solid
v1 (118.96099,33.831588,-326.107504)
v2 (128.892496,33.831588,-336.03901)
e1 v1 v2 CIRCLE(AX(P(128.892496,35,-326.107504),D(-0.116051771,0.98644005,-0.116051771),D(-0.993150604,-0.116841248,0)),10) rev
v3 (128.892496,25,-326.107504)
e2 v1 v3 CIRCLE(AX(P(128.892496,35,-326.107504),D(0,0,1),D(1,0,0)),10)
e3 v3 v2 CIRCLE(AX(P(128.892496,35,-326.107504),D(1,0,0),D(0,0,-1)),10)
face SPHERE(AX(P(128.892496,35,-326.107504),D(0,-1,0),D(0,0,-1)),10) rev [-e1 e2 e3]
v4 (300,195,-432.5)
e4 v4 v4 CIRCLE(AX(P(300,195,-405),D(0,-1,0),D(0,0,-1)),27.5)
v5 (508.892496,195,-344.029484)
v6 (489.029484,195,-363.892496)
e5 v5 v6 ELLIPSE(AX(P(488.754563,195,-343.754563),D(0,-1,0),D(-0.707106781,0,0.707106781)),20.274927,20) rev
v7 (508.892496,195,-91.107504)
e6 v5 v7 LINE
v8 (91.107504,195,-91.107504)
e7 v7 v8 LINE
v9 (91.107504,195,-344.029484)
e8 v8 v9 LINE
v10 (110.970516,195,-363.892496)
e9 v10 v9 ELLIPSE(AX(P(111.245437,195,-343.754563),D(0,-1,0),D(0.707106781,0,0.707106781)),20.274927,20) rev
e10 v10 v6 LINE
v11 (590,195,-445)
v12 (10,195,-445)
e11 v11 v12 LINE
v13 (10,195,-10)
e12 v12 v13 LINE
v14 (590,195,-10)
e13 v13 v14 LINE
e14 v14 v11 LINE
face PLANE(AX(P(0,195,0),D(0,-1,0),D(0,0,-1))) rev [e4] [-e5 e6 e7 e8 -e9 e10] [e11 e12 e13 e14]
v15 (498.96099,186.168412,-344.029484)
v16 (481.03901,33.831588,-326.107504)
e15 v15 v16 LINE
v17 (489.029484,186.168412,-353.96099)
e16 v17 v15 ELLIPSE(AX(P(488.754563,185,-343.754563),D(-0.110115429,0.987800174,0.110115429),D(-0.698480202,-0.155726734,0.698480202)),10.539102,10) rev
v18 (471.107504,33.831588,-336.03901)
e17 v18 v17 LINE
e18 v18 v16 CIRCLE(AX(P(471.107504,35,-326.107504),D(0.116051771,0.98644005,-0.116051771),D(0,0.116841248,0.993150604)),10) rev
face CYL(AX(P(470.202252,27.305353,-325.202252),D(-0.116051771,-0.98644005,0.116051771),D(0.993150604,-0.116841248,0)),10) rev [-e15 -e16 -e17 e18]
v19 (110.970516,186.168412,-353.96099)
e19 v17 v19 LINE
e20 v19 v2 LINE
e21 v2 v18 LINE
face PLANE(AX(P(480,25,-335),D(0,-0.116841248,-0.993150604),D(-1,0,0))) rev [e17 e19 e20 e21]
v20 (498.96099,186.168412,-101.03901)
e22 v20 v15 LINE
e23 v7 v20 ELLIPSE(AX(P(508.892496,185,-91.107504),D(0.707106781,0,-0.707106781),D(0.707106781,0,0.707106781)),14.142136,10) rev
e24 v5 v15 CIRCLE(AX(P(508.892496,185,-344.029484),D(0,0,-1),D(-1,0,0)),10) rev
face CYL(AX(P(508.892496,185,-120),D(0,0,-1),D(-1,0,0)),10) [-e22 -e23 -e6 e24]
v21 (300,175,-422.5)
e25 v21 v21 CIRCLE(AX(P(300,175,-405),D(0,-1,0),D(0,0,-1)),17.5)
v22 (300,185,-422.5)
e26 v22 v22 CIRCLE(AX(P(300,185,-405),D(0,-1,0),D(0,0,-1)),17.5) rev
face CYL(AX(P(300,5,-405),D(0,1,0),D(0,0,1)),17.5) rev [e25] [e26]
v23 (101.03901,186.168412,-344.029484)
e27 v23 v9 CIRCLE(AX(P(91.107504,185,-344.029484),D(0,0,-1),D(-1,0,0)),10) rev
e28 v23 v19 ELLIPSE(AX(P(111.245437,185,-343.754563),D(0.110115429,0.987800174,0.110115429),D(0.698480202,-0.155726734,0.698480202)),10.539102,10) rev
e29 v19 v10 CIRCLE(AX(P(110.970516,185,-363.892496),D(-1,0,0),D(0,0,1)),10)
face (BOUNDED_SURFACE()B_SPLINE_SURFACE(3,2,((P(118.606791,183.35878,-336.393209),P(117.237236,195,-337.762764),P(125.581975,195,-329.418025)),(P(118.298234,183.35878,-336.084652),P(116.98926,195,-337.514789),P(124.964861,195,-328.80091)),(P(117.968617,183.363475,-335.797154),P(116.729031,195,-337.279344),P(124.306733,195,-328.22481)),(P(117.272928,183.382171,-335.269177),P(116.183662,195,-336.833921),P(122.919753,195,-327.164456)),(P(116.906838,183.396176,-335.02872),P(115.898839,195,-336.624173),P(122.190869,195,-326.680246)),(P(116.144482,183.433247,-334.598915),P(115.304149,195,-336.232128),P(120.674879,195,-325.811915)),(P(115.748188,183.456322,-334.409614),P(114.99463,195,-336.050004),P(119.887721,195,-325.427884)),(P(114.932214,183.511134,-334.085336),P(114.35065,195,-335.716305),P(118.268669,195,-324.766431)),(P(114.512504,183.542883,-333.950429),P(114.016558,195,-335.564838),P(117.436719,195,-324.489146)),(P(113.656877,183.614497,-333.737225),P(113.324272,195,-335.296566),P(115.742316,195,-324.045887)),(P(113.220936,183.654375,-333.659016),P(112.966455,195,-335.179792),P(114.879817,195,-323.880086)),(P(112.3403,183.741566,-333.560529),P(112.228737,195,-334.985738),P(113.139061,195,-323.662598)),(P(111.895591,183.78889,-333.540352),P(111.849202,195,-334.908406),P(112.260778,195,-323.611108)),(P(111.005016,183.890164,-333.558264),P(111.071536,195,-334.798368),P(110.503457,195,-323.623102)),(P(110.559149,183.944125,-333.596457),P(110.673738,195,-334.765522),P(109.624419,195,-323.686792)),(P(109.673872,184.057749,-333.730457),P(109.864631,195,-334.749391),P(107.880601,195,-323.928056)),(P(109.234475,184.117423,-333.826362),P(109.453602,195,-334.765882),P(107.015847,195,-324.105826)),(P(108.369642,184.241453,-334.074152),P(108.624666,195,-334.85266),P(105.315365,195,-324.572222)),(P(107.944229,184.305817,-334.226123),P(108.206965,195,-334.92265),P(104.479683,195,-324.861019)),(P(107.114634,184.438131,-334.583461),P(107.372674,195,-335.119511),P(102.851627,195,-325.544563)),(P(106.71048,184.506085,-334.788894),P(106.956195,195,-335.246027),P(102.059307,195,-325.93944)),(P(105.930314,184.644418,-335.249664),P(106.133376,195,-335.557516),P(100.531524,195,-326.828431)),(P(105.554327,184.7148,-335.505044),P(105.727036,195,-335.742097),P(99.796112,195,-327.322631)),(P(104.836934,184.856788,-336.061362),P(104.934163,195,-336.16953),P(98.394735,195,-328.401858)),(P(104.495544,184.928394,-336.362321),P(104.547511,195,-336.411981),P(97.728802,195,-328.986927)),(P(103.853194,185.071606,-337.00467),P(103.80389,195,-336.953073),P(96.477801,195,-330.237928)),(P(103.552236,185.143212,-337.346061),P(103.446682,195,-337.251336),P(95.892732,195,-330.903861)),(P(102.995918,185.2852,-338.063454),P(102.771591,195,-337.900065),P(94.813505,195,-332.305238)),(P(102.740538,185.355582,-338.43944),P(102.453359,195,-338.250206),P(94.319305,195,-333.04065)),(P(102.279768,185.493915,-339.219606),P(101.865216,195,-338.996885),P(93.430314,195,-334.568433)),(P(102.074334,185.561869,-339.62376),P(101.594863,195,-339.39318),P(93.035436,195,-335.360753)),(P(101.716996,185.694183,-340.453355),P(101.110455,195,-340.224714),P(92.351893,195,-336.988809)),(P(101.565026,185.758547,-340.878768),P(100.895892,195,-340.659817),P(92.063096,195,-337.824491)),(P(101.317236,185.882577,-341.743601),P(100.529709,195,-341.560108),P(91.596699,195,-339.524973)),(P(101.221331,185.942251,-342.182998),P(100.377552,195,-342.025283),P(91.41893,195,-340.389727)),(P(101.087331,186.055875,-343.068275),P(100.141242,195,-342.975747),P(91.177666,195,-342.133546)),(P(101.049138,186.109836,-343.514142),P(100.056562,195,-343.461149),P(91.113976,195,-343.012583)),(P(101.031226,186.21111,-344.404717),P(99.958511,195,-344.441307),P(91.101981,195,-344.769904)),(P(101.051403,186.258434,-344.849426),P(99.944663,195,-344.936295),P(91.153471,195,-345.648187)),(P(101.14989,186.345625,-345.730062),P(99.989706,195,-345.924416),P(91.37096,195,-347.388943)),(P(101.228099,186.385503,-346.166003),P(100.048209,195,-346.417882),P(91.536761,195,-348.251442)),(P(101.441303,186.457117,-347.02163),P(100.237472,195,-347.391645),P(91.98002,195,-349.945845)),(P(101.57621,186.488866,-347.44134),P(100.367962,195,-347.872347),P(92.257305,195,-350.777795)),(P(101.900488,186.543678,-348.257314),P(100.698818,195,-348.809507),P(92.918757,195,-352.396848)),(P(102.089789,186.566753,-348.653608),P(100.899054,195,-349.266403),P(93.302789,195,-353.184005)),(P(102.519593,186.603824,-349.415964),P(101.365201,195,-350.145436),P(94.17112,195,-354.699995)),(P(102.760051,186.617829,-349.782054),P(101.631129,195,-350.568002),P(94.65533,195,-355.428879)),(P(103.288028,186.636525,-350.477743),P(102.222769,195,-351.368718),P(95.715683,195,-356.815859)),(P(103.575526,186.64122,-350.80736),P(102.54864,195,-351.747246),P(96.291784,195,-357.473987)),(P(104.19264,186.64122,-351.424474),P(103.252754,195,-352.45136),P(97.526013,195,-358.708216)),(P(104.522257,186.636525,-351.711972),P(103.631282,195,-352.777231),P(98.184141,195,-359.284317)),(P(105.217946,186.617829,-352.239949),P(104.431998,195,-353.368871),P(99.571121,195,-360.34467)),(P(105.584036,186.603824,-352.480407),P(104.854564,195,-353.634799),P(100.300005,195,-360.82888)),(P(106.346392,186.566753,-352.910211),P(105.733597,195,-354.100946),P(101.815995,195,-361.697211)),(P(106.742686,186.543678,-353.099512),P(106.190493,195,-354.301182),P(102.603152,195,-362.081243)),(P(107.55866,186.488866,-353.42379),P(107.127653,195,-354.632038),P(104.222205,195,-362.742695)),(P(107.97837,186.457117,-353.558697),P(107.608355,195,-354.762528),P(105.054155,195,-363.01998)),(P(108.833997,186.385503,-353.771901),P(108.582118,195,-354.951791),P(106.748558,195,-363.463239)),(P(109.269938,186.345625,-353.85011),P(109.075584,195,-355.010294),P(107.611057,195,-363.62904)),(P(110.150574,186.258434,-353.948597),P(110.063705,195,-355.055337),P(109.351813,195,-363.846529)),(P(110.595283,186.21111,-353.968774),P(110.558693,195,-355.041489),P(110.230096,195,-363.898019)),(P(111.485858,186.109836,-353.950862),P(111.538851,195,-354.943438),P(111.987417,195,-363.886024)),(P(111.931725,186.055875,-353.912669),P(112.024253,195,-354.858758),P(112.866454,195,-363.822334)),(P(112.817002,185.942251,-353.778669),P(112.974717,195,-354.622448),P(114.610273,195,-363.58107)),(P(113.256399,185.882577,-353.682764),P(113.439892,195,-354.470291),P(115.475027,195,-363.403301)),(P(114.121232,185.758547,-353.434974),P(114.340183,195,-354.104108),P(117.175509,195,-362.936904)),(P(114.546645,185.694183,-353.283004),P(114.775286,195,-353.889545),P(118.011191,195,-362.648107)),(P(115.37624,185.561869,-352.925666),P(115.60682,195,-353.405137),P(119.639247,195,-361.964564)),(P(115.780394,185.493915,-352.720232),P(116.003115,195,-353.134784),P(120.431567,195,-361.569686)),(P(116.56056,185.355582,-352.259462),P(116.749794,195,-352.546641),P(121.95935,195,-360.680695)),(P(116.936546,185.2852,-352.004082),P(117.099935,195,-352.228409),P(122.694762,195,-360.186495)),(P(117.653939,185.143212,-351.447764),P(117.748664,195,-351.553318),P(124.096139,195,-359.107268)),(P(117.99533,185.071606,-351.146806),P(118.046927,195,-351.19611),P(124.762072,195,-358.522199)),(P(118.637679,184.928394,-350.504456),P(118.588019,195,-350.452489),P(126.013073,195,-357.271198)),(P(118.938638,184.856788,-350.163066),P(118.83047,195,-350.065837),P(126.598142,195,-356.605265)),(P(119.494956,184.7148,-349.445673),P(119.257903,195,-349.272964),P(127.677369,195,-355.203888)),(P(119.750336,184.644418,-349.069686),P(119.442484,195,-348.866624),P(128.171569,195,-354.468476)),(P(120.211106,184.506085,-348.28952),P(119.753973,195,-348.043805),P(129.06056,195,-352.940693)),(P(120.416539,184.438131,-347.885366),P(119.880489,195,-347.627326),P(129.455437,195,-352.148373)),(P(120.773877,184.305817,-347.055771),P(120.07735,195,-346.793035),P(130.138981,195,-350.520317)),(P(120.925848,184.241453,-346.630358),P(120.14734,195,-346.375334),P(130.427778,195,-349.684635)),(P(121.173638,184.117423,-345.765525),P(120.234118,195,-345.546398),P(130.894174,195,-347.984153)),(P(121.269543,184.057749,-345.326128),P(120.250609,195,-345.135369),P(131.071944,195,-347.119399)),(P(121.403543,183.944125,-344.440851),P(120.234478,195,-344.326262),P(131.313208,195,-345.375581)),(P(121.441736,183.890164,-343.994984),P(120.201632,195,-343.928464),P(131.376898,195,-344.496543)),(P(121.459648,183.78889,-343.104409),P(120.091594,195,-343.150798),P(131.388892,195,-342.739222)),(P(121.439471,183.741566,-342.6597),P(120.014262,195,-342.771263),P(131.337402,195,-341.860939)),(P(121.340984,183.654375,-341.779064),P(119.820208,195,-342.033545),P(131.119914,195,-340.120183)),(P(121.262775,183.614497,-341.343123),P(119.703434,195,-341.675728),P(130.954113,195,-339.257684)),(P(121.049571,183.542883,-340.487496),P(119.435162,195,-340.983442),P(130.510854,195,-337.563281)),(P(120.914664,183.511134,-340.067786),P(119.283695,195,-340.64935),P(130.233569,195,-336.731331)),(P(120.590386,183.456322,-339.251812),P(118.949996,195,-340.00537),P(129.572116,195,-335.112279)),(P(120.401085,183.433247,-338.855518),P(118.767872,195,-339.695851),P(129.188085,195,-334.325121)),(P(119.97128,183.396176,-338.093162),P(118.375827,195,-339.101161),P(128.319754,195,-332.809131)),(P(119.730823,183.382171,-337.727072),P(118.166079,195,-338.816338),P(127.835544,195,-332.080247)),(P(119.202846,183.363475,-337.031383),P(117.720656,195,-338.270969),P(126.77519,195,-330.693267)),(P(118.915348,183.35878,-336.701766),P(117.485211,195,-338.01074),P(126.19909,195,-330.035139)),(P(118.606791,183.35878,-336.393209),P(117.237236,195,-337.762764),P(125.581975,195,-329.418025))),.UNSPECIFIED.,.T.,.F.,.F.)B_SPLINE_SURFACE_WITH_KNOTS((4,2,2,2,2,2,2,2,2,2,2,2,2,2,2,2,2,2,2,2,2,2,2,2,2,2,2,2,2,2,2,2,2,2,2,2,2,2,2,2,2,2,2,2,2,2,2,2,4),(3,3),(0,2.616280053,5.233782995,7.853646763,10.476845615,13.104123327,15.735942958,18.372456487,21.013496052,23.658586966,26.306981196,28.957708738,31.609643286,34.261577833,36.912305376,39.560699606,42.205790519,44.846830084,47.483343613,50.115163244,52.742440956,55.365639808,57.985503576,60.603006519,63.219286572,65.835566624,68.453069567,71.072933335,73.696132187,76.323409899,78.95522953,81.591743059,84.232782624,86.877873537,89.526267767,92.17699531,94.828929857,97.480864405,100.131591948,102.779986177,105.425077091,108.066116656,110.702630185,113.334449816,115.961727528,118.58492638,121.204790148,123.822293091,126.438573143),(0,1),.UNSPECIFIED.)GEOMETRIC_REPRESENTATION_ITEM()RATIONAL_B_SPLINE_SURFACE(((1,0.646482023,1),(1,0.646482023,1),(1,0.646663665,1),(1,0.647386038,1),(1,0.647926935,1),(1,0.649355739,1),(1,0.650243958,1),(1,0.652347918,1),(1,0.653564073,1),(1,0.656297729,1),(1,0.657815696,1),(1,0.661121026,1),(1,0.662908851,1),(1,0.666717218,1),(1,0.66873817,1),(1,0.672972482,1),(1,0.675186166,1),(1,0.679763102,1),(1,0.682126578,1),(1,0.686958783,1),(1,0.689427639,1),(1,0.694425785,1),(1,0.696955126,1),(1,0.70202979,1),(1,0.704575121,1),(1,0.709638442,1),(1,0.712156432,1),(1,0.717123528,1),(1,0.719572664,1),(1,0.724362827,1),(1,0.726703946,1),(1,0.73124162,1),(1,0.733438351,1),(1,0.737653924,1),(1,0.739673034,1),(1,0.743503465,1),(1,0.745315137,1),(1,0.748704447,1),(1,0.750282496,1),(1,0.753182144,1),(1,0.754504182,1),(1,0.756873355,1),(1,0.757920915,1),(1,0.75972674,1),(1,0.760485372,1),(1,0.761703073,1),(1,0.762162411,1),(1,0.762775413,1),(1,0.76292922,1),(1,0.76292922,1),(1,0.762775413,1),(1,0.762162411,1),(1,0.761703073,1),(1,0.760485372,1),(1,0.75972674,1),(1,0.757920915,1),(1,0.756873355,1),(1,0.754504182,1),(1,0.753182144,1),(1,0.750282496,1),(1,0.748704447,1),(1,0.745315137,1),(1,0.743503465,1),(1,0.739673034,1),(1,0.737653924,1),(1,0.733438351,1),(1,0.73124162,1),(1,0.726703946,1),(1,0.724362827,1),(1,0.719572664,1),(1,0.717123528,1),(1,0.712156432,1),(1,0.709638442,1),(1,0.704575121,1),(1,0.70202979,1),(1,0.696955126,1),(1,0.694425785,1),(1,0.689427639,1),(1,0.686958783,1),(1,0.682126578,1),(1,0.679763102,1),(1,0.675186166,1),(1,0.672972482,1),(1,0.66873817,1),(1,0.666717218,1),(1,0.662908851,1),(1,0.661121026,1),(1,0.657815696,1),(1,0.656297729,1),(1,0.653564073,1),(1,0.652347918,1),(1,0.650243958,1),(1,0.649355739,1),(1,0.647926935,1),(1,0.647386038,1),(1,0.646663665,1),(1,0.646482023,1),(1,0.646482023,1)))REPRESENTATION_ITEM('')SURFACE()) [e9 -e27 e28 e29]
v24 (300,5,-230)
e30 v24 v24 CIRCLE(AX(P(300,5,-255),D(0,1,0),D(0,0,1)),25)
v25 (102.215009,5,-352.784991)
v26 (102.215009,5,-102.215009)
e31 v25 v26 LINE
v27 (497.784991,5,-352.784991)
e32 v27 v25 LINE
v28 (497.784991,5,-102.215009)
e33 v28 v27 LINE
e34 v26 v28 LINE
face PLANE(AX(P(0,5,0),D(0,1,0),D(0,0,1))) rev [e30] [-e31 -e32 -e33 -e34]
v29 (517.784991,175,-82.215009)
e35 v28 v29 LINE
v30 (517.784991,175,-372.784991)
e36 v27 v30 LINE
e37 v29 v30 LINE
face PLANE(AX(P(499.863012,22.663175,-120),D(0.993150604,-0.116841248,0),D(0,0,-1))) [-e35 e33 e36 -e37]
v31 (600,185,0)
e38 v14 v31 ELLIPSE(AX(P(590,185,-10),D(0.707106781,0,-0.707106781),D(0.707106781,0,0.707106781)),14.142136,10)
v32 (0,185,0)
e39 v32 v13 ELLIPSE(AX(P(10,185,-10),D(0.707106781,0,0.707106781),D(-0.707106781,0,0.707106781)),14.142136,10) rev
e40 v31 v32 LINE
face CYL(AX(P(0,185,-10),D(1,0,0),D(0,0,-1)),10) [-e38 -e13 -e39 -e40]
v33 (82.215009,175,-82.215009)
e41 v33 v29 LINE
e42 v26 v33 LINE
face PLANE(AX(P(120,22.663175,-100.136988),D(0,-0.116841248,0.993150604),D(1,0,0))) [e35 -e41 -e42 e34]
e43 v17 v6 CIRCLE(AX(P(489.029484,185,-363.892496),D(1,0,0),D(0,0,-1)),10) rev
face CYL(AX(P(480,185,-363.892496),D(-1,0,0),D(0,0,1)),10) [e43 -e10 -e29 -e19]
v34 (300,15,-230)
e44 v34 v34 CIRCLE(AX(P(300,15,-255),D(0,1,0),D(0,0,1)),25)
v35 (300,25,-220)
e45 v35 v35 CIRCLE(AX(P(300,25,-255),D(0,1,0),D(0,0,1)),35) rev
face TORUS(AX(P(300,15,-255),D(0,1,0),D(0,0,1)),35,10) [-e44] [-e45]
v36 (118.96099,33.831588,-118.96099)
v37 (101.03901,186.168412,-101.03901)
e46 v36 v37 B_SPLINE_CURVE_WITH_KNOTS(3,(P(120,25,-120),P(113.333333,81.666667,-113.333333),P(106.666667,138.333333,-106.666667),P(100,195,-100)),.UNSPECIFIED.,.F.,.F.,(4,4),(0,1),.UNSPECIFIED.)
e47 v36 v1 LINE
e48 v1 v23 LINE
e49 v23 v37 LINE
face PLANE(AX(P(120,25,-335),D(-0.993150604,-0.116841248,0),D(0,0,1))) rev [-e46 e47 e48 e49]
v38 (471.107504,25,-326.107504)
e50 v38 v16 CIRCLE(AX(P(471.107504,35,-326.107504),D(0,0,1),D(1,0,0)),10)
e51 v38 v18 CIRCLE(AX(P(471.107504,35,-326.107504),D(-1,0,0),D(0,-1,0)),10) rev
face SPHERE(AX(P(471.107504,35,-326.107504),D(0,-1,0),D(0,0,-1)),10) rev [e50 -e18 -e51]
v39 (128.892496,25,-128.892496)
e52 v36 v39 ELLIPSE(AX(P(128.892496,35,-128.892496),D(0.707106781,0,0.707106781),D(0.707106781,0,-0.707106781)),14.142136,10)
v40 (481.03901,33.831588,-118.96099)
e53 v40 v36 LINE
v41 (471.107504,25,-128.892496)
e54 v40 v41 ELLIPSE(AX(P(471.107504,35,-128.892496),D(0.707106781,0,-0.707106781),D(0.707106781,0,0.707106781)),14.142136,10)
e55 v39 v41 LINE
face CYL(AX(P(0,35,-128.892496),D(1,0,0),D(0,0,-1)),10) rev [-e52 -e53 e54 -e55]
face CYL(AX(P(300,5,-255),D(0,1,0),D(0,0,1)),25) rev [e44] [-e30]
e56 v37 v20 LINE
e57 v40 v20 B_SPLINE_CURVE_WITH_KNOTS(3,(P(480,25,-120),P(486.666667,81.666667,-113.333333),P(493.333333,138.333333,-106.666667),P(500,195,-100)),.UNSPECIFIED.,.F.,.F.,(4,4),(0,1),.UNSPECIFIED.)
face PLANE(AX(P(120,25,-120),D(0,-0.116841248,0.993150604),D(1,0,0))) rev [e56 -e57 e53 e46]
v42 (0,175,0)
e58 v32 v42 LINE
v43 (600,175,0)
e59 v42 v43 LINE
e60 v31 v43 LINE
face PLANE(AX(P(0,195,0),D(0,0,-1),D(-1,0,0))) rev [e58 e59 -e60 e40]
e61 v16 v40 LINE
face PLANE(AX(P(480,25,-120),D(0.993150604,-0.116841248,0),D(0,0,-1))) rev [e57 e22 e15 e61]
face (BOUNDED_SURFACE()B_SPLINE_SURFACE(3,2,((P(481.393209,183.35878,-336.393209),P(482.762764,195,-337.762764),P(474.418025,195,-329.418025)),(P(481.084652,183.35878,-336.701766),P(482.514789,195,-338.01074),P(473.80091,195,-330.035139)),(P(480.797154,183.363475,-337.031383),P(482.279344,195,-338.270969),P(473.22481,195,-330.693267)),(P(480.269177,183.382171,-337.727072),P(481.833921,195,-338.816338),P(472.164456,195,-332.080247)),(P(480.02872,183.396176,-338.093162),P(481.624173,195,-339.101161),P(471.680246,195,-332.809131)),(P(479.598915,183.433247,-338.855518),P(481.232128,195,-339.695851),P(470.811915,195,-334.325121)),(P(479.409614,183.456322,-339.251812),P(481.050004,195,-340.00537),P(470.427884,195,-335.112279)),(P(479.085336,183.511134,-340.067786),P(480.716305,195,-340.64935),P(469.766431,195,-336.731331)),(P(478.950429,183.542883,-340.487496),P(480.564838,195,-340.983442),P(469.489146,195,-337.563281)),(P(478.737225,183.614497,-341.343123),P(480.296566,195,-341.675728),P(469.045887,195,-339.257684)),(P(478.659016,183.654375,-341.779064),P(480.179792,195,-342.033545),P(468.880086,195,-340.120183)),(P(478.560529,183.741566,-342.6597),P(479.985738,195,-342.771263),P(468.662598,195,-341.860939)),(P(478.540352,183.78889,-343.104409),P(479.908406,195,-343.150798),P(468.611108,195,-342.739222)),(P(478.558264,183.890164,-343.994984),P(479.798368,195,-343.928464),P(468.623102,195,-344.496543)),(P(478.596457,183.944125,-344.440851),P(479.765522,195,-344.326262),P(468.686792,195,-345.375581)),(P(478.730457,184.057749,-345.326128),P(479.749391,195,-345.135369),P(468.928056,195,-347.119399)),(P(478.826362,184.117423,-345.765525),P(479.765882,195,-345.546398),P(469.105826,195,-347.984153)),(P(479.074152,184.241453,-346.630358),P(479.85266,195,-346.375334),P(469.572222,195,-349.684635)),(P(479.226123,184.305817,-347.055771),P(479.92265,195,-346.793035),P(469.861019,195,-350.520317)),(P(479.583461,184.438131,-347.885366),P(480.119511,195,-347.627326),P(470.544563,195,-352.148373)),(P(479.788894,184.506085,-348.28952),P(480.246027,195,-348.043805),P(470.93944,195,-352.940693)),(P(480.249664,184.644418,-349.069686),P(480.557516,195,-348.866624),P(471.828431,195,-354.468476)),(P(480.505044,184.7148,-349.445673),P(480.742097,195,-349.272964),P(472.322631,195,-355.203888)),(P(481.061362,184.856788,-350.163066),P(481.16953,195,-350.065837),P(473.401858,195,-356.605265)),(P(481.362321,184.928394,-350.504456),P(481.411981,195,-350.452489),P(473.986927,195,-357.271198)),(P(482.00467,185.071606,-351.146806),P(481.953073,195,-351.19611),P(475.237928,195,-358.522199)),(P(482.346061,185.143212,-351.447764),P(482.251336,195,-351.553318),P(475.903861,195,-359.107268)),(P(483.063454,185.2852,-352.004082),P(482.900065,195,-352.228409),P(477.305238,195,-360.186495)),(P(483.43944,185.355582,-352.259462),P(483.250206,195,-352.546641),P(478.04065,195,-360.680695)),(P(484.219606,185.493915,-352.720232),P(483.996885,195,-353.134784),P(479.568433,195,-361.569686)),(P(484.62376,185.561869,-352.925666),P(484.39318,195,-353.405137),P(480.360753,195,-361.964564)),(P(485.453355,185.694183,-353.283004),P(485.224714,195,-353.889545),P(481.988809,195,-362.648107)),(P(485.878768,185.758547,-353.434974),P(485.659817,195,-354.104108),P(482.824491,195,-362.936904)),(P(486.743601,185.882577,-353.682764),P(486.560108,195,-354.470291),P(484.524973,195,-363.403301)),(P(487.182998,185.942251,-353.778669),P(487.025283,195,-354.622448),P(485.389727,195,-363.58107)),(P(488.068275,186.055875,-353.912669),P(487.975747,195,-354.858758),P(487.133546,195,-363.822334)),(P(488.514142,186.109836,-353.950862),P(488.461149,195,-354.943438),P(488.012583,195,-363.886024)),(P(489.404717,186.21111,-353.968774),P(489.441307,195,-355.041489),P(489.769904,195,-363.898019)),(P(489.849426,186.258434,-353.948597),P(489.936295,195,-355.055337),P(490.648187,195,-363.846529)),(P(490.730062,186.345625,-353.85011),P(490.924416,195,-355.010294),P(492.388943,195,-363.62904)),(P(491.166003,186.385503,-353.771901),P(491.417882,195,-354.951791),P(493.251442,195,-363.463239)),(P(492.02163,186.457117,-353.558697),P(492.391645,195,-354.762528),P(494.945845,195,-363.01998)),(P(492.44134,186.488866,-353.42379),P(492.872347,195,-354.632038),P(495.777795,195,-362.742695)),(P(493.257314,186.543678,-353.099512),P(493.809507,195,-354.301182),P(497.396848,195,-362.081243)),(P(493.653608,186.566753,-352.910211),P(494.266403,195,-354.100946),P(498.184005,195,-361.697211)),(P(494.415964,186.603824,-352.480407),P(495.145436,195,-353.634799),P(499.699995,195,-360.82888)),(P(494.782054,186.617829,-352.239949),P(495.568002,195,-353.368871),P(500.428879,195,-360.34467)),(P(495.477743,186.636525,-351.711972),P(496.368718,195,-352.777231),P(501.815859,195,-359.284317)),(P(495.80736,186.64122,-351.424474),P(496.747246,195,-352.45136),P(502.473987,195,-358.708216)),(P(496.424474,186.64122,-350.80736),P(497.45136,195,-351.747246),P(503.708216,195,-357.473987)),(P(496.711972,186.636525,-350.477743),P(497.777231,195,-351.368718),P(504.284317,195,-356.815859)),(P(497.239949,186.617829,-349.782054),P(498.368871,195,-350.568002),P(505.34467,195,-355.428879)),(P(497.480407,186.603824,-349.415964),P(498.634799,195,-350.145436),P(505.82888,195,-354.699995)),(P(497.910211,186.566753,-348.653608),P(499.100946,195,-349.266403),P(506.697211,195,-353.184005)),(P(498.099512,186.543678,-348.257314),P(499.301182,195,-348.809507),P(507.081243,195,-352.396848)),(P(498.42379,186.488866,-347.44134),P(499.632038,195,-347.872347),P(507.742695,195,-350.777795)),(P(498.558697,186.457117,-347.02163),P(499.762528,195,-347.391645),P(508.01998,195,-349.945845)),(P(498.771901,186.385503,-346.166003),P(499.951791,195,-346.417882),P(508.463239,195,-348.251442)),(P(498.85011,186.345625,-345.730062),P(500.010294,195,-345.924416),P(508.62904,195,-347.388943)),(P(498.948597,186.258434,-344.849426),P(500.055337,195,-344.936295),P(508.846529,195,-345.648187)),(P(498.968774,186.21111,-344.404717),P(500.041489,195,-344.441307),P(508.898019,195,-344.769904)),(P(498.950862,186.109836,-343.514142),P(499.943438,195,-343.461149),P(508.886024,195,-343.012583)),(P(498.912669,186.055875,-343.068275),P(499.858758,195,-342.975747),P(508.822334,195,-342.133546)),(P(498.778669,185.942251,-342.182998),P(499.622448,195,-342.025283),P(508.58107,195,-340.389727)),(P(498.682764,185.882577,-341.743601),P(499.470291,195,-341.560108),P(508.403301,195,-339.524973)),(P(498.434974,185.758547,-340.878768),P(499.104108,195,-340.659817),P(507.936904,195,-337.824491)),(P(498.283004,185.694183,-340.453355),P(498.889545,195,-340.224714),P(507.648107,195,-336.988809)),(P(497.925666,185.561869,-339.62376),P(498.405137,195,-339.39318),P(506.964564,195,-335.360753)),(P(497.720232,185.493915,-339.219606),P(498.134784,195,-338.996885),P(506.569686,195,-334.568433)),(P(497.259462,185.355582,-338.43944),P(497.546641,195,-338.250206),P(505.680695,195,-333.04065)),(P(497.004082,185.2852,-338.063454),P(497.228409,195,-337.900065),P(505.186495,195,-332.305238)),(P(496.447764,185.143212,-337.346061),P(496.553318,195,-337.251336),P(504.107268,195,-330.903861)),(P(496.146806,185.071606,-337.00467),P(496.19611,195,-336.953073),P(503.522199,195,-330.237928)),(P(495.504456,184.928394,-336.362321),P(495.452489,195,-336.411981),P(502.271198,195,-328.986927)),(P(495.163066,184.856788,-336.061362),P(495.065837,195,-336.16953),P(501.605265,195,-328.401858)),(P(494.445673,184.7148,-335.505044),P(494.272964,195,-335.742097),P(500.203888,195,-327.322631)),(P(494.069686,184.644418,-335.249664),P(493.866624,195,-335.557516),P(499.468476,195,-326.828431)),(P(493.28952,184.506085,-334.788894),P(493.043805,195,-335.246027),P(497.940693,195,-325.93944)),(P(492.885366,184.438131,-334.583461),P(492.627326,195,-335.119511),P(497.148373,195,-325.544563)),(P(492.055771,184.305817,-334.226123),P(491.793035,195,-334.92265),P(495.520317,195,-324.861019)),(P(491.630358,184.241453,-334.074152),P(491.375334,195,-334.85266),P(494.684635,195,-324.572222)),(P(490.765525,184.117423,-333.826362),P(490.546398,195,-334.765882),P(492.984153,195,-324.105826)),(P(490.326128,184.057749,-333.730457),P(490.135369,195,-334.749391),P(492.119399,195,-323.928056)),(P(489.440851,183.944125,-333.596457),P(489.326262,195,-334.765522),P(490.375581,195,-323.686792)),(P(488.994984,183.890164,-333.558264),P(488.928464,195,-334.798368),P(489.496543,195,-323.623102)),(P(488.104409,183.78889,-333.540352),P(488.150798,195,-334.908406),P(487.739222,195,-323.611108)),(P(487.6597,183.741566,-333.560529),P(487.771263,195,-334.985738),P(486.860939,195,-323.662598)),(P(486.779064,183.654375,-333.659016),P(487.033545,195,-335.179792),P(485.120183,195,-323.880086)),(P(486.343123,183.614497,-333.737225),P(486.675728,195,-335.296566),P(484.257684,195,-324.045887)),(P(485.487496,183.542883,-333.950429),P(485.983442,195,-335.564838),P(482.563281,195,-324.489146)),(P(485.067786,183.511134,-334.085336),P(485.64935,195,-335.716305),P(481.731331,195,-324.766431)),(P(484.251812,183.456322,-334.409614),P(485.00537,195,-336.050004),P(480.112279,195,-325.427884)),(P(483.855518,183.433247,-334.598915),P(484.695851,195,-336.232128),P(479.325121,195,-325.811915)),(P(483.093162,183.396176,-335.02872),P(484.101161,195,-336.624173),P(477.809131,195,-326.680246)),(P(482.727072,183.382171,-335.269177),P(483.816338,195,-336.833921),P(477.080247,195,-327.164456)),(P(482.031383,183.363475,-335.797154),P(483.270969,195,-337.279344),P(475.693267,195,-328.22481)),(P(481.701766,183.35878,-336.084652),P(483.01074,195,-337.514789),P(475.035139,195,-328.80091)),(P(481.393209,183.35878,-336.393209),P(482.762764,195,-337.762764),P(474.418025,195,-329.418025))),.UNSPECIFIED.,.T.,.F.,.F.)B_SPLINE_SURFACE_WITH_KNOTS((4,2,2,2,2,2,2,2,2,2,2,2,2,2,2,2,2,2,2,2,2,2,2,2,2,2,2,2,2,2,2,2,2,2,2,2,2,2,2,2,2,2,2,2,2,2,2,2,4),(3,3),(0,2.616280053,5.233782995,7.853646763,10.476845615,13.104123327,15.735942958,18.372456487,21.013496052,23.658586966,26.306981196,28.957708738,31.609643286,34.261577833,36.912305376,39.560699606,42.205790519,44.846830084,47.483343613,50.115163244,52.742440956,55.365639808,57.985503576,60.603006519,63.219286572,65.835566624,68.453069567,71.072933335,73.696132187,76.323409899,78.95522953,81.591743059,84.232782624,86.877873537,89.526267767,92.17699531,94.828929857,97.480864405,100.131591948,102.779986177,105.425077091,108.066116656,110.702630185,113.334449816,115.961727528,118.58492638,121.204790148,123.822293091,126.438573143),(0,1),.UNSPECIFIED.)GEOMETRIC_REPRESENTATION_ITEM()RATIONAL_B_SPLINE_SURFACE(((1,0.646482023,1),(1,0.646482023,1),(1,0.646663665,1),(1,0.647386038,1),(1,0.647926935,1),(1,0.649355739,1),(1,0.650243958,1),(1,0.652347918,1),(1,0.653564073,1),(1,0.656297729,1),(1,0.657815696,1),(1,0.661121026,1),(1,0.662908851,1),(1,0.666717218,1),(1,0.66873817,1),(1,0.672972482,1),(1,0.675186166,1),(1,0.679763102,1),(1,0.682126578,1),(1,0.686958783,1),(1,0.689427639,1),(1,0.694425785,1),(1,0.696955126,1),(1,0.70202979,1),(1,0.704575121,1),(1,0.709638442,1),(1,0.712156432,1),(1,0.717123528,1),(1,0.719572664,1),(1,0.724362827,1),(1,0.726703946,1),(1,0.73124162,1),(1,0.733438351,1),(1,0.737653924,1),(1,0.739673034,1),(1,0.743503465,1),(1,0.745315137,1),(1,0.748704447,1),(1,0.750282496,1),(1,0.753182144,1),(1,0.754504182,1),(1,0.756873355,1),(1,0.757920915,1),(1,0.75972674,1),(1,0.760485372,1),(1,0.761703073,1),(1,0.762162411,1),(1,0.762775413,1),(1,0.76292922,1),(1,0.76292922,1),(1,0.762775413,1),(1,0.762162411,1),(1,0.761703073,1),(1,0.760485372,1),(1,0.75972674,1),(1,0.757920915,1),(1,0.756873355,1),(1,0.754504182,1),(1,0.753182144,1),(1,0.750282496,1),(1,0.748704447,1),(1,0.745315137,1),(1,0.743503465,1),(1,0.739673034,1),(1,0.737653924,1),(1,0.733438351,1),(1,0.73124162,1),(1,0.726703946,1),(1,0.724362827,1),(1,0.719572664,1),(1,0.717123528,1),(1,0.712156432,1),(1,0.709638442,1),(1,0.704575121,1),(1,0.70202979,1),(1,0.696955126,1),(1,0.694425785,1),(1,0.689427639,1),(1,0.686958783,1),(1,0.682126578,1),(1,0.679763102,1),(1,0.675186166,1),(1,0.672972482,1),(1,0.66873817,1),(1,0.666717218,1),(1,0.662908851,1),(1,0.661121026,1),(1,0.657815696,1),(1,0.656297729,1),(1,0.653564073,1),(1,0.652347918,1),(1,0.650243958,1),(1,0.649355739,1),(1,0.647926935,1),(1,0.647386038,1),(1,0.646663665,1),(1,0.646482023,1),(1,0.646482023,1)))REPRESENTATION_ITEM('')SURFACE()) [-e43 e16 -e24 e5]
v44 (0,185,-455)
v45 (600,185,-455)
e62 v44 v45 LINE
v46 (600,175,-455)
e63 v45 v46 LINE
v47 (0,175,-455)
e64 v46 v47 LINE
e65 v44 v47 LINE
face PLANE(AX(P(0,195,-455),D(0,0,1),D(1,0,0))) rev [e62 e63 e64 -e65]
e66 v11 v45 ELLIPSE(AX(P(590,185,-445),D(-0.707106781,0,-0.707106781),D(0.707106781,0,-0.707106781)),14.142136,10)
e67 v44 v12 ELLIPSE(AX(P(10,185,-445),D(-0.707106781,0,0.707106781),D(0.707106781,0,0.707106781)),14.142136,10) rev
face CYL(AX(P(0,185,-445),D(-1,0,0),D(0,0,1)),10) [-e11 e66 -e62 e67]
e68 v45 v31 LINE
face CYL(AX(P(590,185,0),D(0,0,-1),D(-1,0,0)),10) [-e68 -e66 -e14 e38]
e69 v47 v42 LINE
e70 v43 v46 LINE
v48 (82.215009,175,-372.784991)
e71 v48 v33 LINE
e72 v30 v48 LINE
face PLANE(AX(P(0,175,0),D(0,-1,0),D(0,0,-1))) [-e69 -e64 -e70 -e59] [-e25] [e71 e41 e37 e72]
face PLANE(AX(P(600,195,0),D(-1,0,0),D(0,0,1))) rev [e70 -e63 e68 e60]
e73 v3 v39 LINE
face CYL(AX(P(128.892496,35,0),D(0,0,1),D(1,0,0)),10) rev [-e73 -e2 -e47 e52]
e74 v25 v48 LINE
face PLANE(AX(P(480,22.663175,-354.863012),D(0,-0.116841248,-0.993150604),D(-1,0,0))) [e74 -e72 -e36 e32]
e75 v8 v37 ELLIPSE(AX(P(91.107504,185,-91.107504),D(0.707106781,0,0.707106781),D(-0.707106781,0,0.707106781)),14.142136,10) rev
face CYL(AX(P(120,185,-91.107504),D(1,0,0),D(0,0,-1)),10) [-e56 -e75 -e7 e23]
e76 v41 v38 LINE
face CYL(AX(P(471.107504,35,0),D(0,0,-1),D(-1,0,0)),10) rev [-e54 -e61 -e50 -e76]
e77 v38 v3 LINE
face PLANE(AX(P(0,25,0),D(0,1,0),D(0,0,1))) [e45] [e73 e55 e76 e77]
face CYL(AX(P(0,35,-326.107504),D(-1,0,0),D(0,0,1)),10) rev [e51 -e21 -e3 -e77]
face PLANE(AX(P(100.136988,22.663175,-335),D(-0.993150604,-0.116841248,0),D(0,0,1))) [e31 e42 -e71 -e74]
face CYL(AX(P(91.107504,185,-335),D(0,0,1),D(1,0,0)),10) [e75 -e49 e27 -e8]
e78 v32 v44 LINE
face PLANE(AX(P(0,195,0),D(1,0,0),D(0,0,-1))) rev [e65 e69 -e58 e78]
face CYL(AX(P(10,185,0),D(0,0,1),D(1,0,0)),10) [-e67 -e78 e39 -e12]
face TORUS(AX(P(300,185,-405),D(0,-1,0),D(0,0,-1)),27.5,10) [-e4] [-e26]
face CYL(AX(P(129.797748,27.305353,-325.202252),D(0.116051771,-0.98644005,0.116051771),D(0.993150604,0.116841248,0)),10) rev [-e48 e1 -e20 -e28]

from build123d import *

# Parameters (mm, degrees)
SKETCH_1_W          = 600
SKETCH_1_H          = 455
EXTRUDE_1_DEPTH     = 195
LOFT_1_OUTLINE_W    = 360
LOFT_1_OUTLINE_H    = 215
LOFT_1_DEPTH        = 170
LOFT_1_DRAFT        = -6.7098368
SHELL_1_T           = -20
SKETCH_3_R          = 25
SKETCH_3_R_2        = 17.5
CUT_EXTRUDE_2_DEPTH = 777.61122835
FILLET_1_R          = 10


# Read off the part's stored shape, not the designer's step: Вырез-По сечениям1
with BuildPart() as part:
    # Эскиз1 → Бобышка-Вытянуть1 (new body)
    with BuildSketch(Plane(origin=(0, 0, 0), x_dir=(1, 0, 0), z_dir=(0, 1, 0))):
        with Locations((300, 227.5)):
            Rectangle(SKETCH_1_W, SKETCH_1_H)
    extrude(amount=EXTRUDE_1_DEPTH)


with BuildPart() as loft_1_tool:
    # Вырез-По сечениям1 outline → Вырез-По сечениям1 (with draft: the straight prism first)
    with BuildSketch(Plane(origin=(0, 25, 0), x_dir=(1, 0, 0), z_dir=(0, 1, 0))):
        with Locations((300, 227.5)):
            Rectangle(LOFT_1_OUTLINE_W, LOFT_1_OUTLINE_H)
    extrude(amount=LOFT_1_DEPTH)
    # Вырез-По сечениям1: the draft: its side faces are tilted about the plane it starts from
    loft_1_sides = [loft_1_tool.faces().sort_by_distance(p)[0] for p in [
        (480, 110, -227.5),
        (300, 110, -335),
        (120, 110, -227.5),
        (300, 110, -120),
    ]]
    draft(loft_1_sides, Plane(origin=(0, 25, 0), x_dir=(1, 0, 0), z_dir=(0, 1, 0)), LOFT_1_DRAFT)


with BuildPart() as part_1:
    add(part.part)

    # Вырез-По сечениям1: cut by loft_1_tool
    add(loft_1_tool.part, mode=Mode.SUBTRACT)

    # Оболочка1
    shell_1_openings = [part_1.faces().sort_by_distance(p)[0] for p in [
        (300, 97.5, 0),
        (0, 97.5, -227.5),
        (600, 97.5, -227.5),
        (300, 0, -227.5),
        (300, 97.5, -455),
    ]]
    offset(amount=SHELL_1_T, openings=shell_1_openings, kind=Kind.INTERSECTION)

    # Эскиз3 → Вырез-Вытянуть2 (cut, through all)
    with BuildSketch(Plane(origin=(0, 195, 0), x_dir=(-1, 0, 0), z_dir=(0, 1, 0))):
        with Locations(Location((-300, -255, 0), (0, 0, 90))):
            Circle(SKETCH_3_R)
        with Locations(Location((-300, -405, 0), (0, 0, 90))):
            Circle(SKETCH_3_R_2)
    extrude(amount=-CUT_EXTRUDE_2_DEPTH, mode=Mode.SUBTRACT)

    # Скругление1
    fillet_1_edges = [part_1.edges().sort_by_distance(p)[0] for p in [
        (300, 195, -455),
        (600, 195, -227.5),
        (300, 195, 0),
        (0, 195, -227.5),
        (100.000000023, 195, -227.5),
        (300, 195, -100.000000023),
        (499.999999977, 195, -227.5),
        (300, 195, -422.5),
        (110.000000012, 110, -344.999999988),
        (300, 195, -354.999999977),
        (489.999999988, 110, -344.999999988),
        (300, 25, -120),
        (120, 25, -227.5),
        (300, 25, -335),
        (480, 25, -227.5),
        (300, 25, -280),
    ]]
    fillet(fillet_1_edges, radius=FILLET_1_R)


solid = part_1.part
